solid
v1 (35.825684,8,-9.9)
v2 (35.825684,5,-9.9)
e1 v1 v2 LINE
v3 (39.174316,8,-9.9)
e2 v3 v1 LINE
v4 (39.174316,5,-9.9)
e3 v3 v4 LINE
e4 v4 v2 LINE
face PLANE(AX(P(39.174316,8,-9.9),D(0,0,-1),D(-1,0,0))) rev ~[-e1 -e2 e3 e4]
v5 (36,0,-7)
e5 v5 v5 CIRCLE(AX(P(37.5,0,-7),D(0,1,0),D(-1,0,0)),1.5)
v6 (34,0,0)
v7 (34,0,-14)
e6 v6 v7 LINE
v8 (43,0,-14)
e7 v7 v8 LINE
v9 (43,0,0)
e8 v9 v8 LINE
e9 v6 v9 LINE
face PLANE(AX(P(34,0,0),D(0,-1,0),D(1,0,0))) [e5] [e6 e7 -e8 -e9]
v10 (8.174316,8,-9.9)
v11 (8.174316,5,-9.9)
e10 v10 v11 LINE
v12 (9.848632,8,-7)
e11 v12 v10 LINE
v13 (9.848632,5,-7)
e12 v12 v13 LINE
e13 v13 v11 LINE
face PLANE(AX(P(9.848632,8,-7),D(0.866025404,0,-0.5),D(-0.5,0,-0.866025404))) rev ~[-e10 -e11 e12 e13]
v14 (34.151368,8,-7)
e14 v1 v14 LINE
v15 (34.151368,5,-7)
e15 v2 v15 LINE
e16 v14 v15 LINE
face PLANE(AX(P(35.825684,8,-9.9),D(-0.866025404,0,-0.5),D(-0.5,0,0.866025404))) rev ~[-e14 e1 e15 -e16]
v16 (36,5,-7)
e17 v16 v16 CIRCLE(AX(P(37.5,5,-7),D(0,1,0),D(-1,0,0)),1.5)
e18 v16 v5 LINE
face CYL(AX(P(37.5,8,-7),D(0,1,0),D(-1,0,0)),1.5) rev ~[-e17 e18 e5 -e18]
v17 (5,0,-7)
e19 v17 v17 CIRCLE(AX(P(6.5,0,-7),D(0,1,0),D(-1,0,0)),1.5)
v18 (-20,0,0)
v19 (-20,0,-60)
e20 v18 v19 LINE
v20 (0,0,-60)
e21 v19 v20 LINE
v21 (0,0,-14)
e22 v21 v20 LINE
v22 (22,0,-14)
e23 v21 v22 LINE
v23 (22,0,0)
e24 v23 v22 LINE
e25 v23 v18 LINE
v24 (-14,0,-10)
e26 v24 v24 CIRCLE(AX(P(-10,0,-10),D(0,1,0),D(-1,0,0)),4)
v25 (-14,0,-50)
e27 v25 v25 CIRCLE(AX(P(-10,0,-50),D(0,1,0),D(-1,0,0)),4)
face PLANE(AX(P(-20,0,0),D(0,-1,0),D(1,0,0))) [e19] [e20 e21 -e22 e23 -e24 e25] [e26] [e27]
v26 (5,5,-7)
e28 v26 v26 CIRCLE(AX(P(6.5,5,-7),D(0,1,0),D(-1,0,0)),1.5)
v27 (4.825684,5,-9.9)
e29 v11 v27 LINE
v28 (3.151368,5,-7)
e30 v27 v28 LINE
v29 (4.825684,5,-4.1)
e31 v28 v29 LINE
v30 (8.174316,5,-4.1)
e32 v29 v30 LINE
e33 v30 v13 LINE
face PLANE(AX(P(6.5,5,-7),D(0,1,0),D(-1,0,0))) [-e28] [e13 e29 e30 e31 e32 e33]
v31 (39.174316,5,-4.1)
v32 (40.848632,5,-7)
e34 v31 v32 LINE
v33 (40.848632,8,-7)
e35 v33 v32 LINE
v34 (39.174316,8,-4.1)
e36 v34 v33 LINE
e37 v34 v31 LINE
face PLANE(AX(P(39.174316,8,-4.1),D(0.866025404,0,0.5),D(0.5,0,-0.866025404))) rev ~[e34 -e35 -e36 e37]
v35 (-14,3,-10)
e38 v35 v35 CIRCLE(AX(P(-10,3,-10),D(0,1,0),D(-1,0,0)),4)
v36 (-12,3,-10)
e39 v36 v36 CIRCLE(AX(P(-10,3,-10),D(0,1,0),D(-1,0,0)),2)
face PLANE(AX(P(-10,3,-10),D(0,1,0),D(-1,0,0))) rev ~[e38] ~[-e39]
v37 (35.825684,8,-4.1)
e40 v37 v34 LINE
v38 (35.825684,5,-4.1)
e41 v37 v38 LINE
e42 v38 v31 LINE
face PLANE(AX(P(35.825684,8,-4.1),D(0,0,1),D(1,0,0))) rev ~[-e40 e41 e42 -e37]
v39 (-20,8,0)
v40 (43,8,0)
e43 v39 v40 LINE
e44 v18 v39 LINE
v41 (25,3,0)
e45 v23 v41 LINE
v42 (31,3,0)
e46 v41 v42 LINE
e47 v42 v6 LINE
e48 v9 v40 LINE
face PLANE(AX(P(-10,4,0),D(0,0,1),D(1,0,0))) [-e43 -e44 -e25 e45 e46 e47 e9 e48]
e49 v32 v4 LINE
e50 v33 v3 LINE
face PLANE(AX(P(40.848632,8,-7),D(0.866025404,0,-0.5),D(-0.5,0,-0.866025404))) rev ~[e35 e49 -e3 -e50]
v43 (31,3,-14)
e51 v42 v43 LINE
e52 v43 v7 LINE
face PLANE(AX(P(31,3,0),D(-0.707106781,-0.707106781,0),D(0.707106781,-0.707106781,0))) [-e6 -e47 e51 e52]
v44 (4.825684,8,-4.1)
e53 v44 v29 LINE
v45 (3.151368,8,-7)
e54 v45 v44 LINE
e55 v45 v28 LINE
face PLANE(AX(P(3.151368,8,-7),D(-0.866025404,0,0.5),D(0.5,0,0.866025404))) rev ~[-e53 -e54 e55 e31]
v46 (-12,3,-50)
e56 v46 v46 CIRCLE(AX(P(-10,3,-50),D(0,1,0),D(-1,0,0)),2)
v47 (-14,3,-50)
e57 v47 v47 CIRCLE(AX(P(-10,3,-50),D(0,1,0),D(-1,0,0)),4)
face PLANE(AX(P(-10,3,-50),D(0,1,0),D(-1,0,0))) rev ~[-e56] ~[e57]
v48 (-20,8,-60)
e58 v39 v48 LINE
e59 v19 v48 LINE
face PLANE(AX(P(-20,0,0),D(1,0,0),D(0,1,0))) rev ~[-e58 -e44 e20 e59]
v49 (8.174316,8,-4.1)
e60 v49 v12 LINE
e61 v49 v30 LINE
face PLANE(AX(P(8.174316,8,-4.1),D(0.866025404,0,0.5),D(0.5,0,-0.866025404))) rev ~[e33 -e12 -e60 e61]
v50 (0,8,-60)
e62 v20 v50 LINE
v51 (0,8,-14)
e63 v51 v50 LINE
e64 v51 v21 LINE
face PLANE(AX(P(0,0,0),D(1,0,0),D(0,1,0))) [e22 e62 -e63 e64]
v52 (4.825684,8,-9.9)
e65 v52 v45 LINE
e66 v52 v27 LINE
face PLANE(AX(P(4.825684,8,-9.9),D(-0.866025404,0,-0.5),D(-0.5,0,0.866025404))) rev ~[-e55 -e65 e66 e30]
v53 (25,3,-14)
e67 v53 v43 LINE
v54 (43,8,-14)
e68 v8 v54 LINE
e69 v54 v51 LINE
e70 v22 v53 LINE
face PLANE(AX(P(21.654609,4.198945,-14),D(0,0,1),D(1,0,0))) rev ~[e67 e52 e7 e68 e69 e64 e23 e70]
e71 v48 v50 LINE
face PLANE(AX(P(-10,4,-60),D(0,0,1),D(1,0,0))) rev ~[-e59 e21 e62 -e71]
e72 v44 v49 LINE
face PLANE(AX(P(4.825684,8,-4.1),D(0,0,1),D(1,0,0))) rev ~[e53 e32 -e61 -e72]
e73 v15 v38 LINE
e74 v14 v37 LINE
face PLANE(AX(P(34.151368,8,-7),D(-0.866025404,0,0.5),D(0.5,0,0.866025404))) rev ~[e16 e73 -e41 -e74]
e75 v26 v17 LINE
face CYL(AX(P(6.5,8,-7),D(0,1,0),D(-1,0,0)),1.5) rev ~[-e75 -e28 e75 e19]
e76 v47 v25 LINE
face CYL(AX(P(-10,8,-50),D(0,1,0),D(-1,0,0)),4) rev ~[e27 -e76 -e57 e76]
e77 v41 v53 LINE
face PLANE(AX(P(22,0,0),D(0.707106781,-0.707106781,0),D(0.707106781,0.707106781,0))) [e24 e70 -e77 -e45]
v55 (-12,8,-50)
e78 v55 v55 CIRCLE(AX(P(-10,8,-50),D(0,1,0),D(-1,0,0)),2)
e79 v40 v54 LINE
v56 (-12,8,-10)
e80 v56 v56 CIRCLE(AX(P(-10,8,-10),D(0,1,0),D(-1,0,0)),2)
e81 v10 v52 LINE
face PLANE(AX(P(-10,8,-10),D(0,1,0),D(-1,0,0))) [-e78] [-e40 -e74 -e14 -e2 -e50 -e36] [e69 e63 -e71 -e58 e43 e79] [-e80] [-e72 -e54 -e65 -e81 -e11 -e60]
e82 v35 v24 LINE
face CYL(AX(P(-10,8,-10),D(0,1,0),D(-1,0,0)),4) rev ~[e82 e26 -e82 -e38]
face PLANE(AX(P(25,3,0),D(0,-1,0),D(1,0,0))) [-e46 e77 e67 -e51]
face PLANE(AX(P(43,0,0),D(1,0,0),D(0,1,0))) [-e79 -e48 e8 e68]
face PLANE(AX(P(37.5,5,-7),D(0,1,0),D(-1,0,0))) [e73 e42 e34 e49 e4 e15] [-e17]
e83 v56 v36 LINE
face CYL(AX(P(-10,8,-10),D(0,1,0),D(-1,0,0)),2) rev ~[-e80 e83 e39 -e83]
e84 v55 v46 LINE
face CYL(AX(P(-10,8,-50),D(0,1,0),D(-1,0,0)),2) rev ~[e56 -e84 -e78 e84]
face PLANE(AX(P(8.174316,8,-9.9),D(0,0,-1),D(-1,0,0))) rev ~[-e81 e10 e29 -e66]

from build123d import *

# Parameters (mm, degrees)
F1_DEPTH = 14
F0_W     = 20
F0_H     = 8
F2_DEPTH = 60
F3_R     = 4
F3_R_2   = 2
F3_R_3   = 1.5
F4_DEPTH = 8.001
F5_DEPTH = 3
F6_DEPTH = 5


# Not quite as in the source:
# - a feature names something its author has since deleted; it is built from what else it names


with BuildPart() as f1:
    # F0 (on Top) → F1 (new body)
    with BuildSketch(Plane.XY):
        Polygon((43, 0), (43, 8), (0, 8), (0, 0), (22, 0), (25, 3), (31, 3), (34, 0), align=None)
    extrude(amount=-F1_DEPTH)

    # F0 (on Top) → F2 (join)
    with BuildSketch(Plane.XY):
        with Locations((-10, 4)):
            Rectangle(F0_W, F0_H)
    extrude(amount=-F2_DEPTH)

    # F3 (on face) → F4 (cut, through all)
    with BuildSketch(Plane(origin=(0, 8, 0), x_dir=(-1, 0, 0), z_dir=(0, 1, 0))):
        with Locations((10, -10)):
            Circle(F3_R)
        with Locations((10, -10)):
            Circle(F3_R_2, mode=Mode.SUBTRACT)
        with Locations((10, -50)):
            Circle(F3_R)
        with Locations((10, -50)):
            Circle(F3_R_2, mode=Mode.SUBTRACT)
        with Locations((10, -10)):
            Circle(F3_R_2)
        with Locations((10, -50)):
            Circle(F3_R_2)
        with Locations((-37.5, -7)):
            Circle(F3_R_3)
        with Locations((-6.5, -7)):
            Circle(F3_R_3)
    extrude(amount=-F4_DEPTH, mode=Mode.SUBTRACT)

    # F3 (on face) → F5 (cut)
    with BuildSketch(Plane(origin=(0, 8, 0), x_dir=(-1, 0, 0), z_dir=(0, 1, 0))):
        Polygon((-8.1743157806, -9.9), (-4.8256842194, -9.9), (-3.1513684387, -7), (-4.8256842194, -4.1), (-8.1743157806, -4.1), (-9.8486315613, -7), align=None)
        with Locations((-6.5, -7)):
            Circle(F3_R_3, mode=Mode.SUBTRACT)
        Polygon((-39.1743157806, -9.9), (-35.8256842194, -9.9), (-34.1513684387, -7), (-35.8256842194, -4.1), (-39.1743157806, -4.1), (-40.8486315613, -7), align=None)
        with Locations((-37.5, -7)):
            Circle(F3_R_3, mode=Mode.SUBTRACT)
    extrude(amount=-F5_DEPTH, mode=Mode.SUBTRACT)

    # F3 (on face) → F6 (join)
    with BuildSketch(Plane(origin=(0, 8, 0), x_dir=(-1, 0, 0), z_dir=(0, 1, 0))):
        with Locations((10, -10)):
            Circle(F3_R)
        with Locations((10, -10)):
            Circle(F3_R_2, mode=Mode.SUBTRACT)
        with Locations((10, -50)):
            Circle(F3_R)
        with Locations((10, -50)):
            Circle(F3_R_2, mode=Mode.SUBTRACT)
    extrude(amount=-F6_DEPTH)


solid = f1.part
